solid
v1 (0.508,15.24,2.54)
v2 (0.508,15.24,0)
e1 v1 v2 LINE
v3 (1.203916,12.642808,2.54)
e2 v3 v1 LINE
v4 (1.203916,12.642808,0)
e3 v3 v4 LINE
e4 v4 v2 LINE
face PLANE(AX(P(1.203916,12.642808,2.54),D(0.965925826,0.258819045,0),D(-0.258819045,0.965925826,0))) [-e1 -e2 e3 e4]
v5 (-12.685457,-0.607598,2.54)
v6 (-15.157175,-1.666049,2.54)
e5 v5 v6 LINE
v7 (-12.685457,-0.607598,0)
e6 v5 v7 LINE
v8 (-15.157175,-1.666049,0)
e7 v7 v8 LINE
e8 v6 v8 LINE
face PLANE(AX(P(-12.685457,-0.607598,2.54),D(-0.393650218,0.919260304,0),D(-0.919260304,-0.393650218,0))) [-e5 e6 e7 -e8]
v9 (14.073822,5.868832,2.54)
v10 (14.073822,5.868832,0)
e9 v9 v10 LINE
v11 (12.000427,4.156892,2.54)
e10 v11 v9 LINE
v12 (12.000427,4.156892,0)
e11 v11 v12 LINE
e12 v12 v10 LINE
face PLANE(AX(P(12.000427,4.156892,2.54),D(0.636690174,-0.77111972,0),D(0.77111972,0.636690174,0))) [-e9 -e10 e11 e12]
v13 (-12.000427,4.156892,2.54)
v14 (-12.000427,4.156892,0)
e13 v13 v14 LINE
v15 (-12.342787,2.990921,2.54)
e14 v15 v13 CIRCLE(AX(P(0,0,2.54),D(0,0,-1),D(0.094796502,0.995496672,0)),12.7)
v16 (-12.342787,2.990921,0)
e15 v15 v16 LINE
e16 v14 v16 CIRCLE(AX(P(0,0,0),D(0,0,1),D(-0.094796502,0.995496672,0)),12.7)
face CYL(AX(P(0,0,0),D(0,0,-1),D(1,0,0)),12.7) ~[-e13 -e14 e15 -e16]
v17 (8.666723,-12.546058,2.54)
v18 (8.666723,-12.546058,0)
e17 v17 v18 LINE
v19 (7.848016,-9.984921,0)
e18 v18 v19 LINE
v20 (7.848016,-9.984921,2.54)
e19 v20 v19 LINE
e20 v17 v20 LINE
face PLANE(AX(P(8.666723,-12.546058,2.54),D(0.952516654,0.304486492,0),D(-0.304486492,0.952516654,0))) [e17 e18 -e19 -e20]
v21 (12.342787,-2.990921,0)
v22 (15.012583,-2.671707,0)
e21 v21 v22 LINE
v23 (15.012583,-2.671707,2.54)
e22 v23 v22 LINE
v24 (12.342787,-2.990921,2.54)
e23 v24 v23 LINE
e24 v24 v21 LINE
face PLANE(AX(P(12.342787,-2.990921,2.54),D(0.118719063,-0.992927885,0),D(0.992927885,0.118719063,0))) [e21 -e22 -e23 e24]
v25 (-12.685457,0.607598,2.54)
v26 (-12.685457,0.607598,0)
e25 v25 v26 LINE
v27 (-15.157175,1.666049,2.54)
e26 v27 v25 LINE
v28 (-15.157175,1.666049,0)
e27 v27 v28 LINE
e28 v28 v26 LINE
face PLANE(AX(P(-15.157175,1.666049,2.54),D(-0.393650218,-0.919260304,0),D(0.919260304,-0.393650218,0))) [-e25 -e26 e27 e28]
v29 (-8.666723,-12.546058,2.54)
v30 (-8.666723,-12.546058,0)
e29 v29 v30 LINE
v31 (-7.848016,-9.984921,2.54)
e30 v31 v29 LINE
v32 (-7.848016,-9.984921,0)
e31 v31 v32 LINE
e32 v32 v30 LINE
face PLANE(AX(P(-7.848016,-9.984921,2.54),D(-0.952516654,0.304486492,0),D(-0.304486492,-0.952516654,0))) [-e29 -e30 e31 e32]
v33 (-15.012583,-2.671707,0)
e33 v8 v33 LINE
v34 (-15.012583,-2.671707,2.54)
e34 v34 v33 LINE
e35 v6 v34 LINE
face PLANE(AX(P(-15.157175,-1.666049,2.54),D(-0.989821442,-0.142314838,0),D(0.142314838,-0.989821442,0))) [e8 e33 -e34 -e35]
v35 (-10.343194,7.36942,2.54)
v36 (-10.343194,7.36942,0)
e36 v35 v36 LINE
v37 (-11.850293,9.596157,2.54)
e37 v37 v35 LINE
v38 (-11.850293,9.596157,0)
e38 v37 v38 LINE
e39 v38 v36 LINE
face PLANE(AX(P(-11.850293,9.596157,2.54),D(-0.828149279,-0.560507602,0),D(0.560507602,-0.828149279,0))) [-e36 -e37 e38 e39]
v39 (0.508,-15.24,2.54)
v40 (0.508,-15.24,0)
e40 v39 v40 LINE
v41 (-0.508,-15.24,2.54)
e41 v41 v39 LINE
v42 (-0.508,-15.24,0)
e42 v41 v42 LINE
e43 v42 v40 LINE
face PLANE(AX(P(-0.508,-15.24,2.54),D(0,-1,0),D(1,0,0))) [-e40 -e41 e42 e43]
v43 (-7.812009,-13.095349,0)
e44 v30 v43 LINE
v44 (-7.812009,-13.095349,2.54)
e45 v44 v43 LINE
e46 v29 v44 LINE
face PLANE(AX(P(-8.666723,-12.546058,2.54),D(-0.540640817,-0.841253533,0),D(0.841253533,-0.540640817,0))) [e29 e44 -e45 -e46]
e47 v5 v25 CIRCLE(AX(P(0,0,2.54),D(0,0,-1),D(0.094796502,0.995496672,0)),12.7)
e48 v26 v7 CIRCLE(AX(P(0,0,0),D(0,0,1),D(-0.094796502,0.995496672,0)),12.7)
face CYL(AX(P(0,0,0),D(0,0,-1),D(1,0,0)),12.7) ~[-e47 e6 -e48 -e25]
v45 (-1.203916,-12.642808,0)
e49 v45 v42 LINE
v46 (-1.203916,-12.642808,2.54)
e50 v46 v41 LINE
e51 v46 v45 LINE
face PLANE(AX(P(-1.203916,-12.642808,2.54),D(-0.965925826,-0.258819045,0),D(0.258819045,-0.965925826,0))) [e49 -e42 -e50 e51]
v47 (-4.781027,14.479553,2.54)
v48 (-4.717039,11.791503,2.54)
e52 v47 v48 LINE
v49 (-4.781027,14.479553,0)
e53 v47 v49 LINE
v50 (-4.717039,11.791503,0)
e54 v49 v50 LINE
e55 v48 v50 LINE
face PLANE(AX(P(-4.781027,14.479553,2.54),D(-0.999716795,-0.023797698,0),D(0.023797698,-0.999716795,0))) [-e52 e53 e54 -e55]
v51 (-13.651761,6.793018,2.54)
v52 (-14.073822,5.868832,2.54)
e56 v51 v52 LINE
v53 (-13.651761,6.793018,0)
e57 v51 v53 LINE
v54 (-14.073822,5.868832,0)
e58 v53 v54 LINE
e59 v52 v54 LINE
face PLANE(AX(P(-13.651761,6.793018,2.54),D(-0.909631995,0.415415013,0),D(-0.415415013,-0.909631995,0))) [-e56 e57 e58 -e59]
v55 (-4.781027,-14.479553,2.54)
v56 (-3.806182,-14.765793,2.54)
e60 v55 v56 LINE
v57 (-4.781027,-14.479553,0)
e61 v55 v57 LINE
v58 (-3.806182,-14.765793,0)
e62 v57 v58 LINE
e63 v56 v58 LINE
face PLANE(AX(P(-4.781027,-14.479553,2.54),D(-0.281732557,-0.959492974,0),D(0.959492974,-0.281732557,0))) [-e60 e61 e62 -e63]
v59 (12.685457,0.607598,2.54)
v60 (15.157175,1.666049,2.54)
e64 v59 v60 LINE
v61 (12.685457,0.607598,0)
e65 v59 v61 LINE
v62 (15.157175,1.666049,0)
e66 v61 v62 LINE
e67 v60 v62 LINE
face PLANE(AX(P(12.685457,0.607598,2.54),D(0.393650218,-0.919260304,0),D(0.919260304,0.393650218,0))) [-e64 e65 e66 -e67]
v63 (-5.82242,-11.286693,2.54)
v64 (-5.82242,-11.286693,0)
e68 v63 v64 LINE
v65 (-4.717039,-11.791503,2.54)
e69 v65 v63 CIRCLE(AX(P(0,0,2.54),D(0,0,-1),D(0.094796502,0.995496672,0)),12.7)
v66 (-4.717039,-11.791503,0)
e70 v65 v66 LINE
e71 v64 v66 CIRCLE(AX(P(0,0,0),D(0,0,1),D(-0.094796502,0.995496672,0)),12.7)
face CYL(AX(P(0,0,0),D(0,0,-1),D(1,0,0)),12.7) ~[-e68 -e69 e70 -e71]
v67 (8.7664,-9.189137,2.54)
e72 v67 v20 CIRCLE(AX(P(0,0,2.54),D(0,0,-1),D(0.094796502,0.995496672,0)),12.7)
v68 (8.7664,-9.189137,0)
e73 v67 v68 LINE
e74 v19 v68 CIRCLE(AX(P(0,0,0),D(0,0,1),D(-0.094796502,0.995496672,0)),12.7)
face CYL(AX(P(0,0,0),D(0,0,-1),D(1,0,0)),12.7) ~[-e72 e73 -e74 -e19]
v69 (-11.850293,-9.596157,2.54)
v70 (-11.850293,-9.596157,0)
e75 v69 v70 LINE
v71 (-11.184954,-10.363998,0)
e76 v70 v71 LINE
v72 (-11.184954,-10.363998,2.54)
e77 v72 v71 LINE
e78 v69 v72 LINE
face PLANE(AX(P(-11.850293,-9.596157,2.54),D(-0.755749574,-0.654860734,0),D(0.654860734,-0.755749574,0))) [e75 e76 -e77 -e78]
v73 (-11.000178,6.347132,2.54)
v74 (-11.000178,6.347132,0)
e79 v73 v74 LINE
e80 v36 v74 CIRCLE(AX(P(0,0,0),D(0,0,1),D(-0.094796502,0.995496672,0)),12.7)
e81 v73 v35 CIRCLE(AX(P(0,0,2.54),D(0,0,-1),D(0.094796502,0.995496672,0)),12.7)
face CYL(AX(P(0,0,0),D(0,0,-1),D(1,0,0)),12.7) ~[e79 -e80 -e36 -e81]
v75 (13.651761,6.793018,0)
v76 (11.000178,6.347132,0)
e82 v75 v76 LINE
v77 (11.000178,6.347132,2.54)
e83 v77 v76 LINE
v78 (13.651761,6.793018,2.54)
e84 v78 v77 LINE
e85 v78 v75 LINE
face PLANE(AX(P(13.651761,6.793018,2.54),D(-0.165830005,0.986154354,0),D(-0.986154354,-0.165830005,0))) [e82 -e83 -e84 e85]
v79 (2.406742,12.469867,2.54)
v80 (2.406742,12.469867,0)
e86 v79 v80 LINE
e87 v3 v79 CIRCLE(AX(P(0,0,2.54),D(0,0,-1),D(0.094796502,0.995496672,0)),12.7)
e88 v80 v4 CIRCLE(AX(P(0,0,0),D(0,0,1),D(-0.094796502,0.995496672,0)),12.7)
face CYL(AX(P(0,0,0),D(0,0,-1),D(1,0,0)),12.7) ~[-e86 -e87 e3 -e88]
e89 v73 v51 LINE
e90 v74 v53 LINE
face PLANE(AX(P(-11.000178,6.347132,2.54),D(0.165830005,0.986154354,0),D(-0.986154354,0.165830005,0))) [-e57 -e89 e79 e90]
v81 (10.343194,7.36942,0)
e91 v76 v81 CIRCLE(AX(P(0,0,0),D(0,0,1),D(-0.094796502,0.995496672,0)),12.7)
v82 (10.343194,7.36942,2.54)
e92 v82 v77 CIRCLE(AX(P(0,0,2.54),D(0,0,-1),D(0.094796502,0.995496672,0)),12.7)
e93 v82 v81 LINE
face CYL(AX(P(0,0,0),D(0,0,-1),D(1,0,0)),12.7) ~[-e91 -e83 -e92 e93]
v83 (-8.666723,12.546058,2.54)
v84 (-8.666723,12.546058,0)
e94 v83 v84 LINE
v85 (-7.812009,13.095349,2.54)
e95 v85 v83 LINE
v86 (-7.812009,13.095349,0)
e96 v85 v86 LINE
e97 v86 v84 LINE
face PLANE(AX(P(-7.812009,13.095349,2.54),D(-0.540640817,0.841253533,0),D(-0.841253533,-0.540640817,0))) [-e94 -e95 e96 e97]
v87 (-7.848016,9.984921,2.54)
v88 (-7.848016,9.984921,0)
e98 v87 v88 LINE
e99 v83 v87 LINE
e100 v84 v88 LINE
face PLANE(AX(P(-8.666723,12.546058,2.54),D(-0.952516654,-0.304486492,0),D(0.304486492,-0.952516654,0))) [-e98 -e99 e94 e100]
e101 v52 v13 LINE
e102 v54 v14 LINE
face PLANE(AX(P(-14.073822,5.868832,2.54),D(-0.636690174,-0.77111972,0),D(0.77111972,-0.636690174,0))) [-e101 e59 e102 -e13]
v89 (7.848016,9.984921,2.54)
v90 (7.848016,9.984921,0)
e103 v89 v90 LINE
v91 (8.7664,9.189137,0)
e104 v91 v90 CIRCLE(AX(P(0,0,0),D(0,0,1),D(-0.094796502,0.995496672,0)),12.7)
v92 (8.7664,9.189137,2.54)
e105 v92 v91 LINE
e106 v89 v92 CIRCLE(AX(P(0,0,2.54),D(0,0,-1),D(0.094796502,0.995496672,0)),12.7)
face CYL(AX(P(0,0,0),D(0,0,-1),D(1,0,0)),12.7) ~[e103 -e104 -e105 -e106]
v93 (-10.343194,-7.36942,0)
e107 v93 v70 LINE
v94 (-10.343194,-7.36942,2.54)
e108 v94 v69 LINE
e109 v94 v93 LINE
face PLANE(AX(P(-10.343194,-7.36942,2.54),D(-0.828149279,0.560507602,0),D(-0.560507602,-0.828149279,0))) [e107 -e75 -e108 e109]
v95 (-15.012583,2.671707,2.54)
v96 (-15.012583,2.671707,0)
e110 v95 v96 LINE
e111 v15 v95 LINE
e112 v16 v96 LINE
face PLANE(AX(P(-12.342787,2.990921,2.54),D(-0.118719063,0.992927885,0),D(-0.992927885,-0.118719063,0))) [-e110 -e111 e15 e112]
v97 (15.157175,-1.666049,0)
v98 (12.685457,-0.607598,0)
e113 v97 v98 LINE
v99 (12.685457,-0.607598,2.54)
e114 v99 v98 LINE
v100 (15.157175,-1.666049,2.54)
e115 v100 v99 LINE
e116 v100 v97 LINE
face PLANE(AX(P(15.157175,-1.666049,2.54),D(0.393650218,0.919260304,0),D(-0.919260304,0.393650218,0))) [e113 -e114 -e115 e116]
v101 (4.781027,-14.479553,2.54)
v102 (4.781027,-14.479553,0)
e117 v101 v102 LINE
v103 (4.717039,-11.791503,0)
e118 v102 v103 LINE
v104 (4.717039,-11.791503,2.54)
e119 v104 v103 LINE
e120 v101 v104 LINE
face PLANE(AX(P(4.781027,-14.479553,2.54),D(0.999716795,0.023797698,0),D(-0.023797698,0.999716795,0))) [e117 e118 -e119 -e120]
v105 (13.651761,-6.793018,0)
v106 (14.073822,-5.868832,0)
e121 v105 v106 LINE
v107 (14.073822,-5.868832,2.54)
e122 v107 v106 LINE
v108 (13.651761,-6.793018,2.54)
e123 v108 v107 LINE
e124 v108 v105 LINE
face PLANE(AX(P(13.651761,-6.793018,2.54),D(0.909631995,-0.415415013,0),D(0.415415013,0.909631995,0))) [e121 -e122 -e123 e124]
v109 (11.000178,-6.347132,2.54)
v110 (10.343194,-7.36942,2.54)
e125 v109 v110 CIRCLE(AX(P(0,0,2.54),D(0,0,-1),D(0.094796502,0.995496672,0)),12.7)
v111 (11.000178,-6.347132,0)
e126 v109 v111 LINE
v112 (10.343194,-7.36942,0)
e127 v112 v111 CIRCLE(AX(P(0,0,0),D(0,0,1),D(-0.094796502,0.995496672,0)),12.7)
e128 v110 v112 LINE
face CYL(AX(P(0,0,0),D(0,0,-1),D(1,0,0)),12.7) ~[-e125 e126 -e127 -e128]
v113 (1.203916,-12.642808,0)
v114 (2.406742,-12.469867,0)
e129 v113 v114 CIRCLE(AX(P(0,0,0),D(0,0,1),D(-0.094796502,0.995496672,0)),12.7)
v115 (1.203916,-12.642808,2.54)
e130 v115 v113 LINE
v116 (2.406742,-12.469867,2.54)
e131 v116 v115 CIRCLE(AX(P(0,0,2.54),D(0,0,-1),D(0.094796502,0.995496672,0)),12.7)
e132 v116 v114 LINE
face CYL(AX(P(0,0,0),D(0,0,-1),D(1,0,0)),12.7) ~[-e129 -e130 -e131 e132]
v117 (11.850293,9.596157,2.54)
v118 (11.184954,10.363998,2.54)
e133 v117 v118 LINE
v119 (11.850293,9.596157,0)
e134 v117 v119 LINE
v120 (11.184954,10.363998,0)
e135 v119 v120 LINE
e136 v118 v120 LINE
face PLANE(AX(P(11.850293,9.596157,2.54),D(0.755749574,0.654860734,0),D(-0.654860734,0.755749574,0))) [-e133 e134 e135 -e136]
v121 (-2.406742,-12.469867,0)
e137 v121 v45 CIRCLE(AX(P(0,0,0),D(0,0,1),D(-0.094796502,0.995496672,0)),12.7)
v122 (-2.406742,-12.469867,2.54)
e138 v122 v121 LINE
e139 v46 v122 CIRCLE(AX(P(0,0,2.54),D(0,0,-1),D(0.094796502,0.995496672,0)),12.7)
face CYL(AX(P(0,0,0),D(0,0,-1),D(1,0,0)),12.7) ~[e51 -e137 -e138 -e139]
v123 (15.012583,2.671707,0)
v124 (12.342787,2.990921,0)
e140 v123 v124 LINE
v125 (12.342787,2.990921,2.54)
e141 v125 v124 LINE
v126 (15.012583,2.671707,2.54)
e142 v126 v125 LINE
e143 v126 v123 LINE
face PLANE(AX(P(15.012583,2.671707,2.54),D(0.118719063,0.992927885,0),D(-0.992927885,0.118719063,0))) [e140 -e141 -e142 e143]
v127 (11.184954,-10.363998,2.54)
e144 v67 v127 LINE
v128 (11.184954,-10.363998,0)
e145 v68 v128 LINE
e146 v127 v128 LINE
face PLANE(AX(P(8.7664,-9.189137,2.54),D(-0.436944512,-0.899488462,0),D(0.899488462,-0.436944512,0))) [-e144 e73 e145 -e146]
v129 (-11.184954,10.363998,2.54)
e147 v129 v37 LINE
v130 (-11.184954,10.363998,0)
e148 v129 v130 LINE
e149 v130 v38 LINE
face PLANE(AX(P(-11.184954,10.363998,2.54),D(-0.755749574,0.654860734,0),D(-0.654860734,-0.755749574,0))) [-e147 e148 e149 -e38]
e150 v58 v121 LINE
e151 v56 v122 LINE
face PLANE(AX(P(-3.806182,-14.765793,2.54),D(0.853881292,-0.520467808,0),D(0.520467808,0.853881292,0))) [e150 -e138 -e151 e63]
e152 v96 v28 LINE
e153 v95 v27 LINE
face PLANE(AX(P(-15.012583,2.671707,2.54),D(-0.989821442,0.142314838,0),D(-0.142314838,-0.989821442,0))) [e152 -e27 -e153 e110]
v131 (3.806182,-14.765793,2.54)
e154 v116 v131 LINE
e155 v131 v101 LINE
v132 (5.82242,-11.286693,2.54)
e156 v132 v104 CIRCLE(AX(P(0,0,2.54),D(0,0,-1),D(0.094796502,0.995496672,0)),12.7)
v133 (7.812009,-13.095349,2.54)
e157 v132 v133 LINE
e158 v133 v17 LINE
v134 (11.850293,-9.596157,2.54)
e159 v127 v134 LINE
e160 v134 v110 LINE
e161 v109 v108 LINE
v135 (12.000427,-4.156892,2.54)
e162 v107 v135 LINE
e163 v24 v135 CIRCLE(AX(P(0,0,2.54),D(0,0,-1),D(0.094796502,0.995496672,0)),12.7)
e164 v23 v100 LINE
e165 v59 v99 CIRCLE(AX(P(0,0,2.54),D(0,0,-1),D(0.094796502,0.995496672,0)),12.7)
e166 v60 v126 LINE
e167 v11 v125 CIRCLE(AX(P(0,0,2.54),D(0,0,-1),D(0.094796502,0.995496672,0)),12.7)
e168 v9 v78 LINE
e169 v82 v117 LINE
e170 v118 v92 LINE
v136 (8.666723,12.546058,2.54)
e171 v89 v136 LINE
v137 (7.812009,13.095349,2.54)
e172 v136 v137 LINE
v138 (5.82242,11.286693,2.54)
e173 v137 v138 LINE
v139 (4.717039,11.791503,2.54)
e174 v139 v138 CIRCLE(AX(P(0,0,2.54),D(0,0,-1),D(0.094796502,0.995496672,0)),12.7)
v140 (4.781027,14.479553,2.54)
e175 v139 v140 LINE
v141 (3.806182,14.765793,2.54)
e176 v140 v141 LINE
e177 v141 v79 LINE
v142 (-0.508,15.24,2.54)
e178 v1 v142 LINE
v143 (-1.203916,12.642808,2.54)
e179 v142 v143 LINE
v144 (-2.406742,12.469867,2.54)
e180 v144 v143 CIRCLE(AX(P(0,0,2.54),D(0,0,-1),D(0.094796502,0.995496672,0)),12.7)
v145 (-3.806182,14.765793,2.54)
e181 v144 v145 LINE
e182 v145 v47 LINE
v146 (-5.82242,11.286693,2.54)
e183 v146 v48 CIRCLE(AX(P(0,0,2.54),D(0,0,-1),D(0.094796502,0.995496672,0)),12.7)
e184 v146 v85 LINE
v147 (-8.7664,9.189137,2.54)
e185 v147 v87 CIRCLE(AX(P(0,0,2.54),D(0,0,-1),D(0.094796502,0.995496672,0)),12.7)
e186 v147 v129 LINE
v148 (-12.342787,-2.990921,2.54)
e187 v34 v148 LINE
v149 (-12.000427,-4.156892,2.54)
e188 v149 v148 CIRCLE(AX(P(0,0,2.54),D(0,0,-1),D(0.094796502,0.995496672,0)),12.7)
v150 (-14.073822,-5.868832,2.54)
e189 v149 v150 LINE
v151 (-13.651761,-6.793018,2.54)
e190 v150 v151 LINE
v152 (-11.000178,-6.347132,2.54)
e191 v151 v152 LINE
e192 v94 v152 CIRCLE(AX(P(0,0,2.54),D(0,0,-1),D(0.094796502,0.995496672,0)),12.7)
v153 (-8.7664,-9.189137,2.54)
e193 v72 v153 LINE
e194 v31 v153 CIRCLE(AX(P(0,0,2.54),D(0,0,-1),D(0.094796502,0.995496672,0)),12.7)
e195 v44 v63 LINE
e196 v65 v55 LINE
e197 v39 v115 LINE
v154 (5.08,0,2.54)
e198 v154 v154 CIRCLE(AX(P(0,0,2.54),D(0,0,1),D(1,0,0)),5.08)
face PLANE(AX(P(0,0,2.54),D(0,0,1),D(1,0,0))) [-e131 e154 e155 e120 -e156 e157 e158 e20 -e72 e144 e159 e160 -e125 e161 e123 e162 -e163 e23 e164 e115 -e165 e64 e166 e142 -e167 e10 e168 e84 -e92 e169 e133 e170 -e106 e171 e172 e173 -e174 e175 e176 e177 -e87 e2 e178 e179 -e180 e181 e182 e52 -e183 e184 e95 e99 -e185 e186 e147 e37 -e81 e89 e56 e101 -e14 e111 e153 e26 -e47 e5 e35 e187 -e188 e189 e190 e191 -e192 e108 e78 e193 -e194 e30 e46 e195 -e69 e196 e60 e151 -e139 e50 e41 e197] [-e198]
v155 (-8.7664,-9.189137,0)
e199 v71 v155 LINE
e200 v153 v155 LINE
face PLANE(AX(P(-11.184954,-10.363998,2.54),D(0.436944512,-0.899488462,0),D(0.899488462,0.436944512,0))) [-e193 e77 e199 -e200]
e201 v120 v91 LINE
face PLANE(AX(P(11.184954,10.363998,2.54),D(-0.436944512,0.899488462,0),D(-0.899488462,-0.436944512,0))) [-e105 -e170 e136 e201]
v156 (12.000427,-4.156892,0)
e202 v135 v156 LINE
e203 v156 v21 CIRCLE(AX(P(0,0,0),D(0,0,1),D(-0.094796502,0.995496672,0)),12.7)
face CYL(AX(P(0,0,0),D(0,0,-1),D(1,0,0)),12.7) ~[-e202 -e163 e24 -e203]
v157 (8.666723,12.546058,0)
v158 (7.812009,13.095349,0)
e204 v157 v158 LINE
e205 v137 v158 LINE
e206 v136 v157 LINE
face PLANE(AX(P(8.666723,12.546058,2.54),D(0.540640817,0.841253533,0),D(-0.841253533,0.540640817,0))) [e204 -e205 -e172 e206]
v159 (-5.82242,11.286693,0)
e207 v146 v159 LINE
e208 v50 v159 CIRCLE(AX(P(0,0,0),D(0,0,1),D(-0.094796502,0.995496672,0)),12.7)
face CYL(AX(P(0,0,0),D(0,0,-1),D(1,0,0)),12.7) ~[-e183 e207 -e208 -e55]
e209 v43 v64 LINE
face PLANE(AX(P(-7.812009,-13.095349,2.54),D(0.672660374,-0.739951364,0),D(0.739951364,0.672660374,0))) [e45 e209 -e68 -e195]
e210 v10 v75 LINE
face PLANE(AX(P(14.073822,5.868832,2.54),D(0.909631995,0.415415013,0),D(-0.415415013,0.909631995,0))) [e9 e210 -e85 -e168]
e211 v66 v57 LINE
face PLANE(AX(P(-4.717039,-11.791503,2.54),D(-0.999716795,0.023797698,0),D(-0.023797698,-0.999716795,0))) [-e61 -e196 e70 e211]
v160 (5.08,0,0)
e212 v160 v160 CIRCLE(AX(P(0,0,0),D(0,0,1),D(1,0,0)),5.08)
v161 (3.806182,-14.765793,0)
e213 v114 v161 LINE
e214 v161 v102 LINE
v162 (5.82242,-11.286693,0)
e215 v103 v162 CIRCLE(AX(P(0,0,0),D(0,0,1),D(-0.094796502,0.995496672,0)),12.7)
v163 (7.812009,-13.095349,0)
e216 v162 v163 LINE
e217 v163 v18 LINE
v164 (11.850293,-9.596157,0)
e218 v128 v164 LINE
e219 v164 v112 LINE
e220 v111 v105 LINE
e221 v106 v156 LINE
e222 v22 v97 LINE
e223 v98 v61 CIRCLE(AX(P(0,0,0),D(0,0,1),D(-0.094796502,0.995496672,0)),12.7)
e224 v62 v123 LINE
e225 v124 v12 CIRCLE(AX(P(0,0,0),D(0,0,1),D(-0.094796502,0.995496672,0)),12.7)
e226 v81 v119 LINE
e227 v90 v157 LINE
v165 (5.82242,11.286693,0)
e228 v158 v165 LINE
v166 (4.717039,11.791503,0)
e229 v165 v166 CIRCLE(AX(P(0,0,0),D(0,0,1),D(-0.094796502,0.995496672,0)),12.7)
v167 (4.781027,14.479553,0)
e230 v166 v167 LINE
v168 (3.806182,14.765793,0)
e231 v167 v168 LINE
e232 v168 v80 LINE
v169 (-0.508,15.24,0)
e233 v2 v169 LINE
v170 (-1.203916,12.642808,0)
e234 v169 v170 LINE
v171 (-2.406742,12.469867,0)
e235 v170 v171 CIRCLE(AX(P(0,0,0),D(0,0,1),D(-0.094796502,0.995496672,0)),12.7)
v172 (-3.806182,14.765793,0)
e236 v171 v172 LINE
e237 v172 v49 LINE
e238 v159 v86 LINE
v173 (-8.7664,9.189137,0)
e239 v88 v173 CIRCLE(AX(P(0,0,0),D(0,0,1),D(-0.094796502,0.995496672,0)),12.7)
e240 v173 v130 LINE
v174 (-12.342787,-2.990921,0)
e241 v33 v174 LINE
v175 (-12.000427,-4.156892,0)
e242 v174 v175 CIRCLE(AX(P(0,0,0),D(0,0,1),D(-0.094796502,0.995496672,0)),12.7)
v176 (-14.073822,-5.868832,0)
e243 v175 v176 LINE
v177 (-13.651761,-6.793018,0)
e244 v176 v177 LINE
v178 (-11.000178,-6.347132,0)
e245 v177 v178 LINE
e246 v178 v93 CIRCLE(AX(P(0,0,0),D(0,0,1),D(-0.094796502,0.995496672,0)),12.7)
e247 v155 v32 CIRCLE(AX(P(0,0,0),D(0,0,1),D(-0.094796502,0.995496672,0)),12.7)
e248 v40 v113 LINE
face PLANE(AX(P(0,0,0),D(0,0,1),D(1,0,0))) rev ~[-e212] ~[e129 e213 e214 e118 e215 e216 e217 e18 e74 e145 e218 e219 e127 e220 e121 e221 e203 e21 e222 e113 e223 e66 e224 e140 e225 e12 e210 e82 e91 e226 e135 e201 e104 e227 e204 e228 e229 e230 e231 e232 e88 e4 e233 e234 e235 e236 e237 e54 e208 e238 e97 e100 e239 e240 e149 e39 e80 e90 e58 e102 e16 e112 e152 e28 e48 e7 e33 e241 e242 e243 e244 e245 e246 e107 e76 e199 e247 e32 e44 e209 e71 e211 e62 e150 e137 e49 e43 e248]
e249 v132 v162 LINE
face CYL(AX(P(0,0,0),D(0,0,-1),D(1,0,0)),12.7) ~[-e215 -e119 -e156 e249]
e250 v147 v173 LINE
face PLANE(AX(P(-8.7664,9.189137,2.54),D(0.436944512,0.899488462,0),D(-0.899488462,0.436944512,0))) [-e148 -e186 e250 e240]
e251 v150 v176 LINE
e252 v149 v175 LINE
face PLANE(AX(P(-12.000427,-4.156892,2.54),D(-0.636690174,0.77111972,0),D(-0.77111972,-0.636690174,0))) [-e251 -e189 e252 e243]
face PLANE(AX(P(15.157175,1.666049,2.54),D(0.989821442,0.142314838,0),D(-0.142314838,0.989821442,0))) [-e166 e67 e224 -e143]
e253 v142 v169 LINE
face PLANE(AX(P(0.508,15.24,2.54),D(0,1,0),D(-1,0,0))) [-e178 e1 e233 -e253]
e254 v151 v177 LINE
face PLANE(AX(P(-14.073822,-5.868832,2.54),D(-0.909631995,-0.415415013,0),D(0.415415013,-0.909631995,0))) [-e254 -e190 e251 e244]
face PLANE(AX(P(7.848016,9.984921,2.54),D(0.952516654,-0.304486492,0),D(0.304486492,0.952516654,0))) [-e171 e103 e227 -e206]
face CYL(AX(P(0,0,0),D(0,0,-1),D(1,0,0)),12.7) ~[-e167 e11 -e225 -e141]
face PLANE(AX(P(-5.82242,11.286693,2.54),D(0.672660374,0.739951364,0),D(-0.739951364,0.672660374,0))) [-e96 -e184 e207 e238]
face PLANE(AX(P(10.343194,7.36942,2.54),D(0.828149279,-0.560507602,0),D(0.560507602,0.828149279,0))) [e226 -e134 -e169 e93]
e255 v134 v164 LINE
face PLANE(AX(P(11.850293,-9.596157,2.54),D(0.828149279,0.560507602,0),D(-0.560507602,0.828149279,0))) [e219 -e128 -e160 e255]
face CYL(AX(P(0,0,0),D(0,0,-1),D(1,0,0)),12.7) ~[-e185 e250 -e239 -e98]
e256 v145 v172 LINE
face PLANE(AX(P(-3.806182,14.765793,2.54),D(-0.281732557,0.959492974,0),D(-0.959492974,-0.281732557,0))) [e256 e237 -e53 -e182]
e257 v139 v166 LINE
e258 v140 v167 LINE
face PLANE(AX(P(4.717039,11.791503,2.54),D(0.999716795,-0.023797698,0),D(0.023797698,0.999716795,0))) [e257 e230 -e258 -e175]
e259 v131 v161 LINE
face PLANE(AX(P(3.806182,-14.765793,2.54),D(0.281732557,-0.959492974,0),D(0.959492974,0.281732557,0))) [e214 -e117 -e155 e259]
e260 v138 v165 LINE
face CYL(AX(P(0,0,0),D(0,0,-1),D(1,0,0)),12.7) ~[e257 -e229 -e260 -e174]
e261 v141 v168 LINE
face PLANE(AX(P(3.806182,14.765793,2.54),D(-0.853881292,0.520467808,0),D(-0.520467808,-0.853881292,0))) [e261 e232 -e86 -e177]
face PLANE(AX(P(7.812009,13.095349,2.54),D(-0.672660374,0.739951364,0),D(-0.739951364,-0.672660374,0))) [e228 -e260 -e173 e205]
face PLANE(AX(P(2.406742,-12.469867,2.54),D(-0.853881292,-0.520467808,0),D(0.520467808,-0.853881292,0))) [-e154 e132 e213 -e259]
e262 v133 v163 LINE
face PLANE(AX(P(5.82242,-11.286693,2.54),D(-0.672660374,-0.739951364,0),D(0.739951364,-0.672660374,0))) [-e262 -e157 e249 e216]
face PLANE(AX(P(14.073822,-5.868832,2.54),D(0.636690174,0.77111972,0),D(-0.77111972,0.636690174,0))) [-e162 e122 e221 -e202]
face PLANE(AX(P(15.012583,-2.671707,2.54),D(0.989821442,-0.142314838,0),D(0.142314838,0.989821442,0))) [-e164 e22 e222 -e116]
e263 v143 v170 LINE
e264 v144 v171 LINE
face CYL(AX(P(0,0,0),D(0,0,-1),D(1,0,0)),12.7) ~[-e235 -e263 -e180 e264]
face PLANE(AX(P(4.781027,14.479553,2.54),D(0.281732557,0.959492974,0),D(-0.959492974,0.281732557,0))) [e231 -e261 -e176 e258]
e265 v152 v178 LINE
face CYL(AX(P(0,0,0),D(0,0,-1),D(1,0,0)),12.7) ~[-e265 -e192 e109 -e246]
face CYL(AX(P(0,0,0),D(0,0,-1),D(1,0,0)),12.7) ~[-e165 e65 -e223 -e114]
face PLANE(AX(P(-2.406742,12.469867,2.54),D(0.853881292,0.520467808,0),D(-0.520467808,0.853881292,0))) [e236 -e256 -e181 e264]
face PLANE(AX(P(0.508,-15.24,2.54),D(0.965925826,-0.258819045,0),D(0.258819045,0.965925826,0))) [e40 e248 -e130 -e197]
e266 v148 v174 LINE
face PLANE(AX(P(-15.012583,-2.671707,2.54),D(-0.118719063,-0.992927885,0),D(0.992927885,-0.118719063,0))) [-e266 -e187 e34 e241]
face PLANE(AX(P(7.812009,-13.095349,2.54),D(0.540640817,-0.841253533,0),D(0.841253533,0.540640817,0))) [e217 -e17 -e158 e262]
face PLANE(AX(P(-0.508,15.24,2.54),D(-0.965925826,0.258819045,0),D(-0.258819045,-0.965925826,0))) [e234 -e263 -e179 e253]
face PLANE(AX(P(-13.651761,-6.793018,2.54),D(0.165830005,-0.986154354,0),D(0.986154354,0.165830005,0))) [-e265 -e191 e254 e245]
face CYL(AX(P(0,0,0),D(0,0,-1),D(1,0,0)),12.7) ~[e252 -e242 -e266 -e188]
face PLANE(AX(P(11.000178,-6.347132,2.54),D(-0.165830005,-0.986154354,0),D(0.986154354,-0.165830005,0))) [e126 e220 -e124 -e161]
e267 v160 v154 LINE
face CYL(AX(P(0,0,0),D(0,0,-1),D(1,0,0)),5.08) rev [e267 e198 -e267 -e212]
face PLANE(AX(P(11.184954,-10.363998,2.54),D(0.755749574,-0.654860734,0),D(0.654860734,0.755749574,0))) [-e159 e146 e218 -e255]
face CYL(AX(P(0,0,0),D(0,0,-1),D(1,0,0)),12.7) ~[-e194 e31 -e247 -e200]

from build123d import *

# Parameters (mm, degrees)
F0_R            = 12.7
F0_R_2          = 5.08
F1_DEPTH        = 2.54
F3_DEPTH        = 2.54
F3_COPIES_COUNT = 22


# Not quite as in the source:
# - a pattern or mirror of a feature is missing from the dataset's text; its kind, count and spacing are read off the source's solid
# - a feature names something its author has since deleted; it is built from what else it names


with BuildPart() as f1:
    # F0 (on Top) → F1 (new body)
    with BuildSketch(Plane.XY):
        Circle(F0_R)
        Circle(F0_R_2, mode=Mode.SUBTRACT)
    extrude(amount=F1_DEPTH)

    # F2 (on face) → F3 (join)
    with BuildSketch(Plane.XY.offset(2.54)):
        with BuildLine():
            ThreePointArc((-1.2039155713, 12.64280773), (0, 12.7), (1.2039155713, 12.64280773))
            Line((1.2039155713, 12.64280773), (0.508, 15.24))
            Line((0.508, 15.24), (0, 15.24))
            Line((0, 15.24), (-0.508, 15.24))
            Line((-0.508, 15.24), (-1.2039155713, 12.64280773))
        make_face()
    f3 = extrude(amount=-F3_DEPTH)

    # F3_copies: F3 ×22 about axis
    f3_copies_axis = Axis((0, 0, 0), (0, 0, 1))
    for i in range(1, F3_COPIES_COUNT):
        add(f3.rotate(f3_copies_axis, i * 360 / F3_COPIES_COUNT))


solid = f1.part
